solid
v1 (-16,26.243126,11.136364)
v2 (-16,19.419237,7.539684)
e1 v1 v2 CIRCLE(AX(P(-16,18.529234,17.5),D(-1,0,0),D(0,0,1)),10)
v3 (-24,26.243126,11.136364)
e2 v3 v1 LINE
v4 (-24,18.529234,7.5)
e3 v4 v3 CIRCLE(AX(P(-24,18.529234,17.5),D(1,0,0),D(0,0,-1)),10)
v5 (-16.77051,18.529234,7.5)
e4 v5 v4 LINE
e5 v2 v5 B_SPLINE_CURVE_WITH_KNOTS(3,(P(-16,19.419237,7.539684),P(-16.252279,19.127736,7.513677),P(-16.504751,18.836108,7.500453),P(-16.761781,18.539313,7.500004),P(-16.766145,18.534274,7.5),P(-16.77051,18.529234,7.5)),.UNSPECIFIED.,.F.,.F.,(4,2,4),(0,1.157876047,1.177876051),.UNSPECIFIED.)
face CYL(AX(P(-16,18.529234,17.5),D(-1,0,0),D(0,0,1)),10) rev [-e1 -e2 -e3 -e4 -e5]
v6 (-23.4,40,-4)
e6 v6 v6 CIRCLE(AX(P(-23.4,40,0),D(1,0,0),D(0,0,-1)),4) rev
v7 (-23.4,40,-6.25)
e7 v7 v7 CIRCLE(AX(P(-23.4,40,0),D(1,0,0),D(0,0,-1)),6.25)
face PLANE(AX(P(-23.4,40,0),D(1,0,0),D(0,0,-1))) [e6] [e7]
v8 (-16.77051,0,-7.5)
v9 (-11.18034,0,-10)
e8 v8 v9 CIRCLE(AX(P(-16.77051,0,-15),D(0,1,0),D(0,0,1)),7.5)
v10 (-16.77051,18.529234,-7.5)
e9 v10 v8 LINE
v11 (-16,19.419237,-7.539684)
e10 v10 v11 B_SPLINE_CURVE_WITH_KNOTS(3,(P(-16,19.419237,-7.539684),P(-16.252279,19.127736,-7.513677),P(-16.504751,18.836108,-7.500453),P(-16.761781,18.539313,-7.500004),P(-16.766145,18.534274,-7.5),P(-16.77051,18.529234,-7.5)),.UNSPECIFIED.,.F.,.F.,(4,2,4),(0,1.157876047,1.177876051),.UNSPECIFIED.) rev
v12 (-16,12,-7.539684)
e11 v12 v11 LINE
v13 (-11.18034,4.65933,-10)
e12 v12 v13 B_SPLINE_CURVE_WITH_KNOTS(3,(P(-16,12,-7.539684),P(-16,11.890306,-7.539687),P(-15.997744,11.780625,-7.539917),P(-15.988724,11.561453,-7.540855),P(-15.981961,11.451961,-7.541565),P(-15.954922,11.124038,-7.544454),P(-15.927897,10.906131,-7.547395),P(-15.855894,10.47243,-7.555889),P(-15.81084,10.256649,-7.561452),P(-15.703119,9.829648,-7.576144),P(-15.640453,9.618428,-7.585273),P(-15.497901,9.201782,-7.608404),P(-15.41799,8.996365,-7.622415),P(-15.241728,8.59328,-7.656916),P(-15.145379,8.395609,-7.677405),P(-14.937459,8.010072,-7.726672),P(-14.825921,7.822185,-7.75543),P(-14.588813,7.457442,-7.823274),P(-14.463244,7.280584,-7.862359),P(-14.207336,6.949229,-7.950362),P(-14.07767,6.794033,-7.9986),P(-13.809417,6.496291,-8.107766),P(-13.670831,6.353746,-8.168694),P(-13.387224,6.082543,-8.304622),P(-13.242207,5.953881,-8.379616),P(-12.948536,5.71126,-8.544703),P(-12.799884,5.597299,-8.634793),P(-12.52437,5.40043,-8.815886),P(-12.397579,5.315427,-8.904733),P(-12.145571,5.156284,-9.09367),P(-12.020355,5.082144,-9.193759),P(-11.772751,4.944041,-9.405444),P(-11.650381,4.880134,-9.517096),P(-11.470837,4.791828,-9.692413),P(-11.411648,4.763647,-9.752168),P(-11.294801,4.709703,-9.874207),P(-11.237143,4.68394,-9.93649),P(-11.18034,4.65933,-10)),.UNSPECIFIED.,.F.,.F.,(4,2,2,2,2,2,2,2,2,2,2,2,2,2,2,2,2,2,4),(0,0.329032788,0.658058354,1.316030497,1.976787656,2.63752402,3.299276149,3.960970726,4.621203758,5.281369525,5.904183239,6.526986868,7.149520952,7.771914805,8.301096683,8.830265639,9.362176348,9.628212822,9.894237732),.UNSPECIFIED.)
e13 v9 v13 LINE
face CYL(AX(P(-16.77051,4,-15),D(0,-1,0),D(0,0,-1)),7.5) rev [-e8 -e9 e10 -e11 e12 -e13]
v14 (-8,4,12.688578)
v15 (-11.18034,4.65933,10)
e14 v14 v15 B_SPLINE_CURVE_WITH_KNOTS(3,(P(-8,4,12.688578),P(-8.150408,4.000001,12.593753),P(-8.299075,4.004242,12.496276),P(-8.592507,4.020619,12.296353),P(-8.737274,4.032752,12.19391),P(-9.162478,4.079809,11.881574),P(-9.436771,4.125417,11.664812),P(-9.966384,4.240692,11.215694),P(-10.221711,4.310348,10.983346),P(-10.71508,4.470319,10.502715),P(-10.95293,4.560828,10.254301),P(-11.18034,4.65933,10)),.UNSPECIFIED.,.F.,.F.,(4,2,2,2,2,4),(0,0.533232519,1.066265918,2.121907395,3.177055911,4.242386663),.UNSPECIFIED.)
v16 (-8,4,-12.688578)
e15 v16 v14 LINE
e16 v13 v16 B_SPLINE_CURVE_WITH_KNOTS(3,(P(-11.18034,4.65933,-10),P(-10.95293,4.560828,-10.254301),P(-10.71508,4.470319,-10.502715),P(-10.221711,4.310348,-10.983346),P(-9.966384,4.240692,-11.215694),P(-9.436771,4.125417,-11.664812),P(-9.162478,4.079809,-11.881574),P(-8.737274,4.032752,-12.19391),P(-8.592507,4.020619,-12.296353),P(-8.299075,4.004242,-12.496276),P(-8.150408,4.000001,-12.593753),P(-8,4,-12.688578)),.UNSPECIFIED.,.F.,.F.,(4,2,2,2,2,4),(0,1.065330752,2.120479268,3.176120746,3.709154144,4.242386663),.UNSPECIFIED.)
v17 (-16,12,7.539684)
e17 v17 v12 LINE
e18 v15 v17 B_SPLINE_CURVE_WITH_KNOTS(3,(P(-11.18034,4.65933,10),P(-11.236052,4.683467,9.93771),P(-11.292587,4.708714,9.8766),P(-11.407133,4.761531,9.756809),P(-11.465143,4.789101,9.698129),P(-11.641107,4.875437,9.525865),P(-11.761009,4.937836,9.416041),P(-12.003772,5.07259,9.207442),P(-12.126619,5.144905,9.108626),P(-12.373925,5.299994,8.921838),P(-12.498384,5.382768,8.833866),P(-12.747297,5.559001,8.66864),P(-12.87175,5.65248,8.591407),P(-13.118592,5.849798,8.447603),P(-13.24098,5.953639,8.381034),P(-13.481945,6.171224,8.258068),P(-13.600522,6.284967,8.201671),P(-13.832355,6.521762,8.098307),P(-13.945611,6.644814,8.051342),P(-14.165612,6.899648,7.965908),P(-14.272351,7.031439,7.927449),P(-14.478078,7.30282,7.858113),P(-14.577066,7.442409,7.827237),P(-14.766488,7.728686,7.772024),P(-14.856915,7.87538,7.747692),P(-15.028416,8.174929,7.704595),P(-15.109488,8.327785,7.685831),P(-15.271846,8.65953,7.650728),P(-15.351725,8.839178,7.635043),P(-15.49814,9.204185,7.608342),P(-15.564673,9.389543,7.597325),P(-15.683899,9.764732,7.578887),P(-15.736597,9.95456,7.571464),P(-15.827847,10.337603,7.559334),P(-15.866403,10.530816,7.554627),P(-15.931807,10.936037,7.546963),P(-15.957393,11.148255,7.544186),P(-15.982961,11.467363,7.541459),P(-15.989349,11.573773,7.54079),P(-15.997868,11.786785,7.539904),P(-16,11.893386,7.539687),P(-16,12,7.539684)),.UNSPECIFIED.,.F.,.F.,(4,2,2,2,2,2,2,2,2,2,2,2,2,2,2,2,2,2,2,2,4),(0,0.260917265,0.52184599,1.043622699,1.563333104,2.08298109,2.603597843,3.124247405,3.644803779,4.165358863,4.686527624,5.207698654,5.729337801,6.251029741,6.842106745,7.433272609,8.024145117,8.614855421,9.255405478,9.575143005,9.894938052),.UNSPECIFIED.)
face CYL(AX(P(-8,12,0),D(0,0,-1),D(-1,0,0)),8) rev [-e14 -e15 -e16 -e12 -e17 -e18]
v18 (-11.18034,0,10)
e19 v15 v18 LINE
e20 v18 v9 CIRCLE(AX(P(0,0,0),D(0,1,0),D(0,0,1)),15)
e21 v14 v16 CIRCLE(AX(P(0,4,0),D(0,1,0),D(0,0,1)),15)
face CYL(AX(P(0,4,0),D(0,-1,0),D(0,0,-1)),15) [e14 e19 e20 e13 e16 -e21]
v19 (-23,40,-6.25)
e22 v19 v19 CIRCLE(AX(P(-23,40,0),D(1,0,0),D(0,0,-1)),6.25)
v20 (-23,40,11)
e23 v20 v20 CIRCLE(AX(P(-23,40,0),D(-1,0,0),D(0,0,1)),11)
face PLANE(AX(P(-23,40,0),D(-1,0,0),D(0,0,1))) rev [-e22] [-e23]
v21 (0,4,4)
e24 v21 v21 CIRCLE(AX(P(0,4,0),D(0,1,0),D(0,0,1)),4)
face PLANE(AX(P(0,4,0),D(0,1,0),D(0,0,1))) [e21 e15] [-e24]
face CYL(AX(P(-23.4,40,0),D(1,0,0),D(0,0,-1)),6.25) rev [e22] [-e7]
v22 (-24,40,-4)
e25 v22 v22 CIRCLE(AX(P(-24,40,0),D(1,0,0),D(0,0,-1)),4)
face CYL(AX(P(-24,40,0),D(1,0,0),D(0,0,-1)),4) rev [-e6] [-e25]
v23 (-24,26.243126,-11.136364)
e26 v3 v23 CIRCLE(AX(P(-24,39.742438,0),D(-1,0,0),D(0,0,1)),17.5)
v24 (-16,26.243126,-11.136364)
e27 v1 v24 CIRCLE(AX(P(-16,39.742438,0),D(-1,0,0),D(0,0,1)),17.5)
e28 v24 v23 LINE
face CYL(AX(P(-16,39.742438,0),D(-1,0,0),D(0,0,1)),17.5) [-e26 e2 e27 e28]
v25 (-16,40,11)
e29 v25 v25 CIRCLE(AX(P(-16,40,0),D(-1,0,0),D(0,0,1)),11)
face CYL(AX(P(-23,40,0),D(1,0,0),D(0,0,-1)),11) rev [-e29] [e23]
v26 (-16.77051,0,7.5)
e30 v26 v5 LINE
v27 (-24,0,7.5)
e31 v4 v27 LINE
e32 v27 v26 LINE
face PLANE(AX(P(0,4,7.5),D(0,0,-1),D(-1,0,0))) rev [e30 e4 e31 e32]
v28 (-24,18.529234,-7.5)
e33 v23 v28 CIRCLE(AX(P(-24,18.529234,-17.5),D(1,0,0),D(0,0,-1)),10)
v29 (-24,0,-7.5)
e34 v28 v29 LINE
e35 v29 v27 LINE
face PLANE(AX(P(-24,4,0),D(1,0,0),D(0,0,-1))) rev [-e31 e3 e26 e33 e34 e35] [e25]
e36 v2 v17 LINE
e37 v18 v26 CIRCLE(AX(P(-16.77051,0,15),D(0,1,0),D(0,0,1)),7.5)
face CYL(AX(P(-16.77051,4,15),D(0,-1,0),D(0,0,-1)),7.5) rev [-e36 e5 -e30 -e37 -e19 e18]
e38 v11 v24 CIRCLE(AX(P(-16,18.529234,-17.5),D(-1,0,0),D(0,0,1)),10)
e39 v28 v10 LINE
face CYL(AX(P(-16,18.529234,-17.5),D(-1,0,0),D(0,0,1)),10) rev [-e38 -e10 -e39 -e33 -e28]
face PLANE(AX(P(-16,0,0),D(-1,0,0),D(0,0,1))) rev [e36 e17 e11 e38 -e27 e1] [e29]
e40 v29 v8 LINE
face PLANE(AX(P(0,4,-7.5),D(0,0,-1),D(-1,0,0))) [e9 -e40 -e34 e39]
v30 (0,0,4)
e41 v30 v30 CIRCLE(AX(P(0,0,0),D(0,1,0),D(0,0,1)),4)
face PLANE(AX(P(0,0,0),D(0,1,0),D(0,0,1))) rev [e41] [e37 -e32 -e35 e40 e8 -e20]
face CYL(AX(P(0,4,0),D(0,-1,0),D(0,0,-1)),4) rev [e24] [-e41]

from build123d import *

# Parameters (mm, degrees)
EXTRUDE_1_DEPTH     = 4
SKETCH_4_R          = 17.5
EXTRUDE_2_DEPTH     = 8
SKETCH_3_R          = 11
CUT_EXTRUDE_1_DEPTH = 7
FILLET_5_R          = 7.5
FILLET_6_R          = 10
FILLET_7_R          = 8
SKETCH_5_R          = 4
CUT_EXTRUDE_2_DEPTH = 71.900963896
SKETCH_6_R          = 6.25
CUT_EXTRUDE_3_DEPTH = 0.4


with BuildPart() as part:
    # 草圖1 → 填料-伸長1 (new body)
    with BuildSketch(Plane(origin=(0, 0, 0), x_dir=(1, 0, 0), z_dir=(0, 1, 0))):
        with BuildLine():
            Line((-24, -7.5), (-12.990381057, -7.5))
            ThreePointArc((-12.990381057, -7.5), (-14.488887394, -3.882285677), (-15, 0))
            Line((-15, 0), (-24, 0))
            Line((-24, 0), (-24, -7.5))
        make_face()
        with BuildLine():
            ThreePointArc((-15, 0), (-14.488887394, 3.882285677), (-12.990381057, 7.5))
            Line((-12.990381057, 7.5), (-24, 7.5))
            Line((-24, 7.5), (-24, 0))
            Line((-24, 0), (-15, 0))
        make_face()
        with BuildLine():
            ThreePointArc((-4, 0), (0, 4), (4, 0))
            Line((4, 0), (15, 0))
            ThreePointArc((15, 0), (3.882285677, 14.488887394), (-12.990381057, 7.5))
            ThreePointArc((-12.990381057, 7.5), (-14.488887394, 3.882285677), (-15, 0))
            Line((-15, 0), (-4, 0))
        make_face()
        with BuildLine():
            Line((15, 0), (4, 0))
            ThreePointArc((4, 0), (0, -4), (-4, 0))
            Line((-4, 0), (-15, 0))
            ThreePointArc((-15, 0), (-14.488887394, -3.882285677), (-12.990381057, -7.5))
            ThreePointArc((-12.990381057, -7.5), (3.882285677, -14.488887394), (15, 0))
        make_face()
    extrude(amount=EXTRUDE_1_DEPTH)

    # 草圖4 → 填料-伸長2 (add)
    with BuildSketch(Plane.ZY.offset(24)):
        with Locations((0, 39.742437699)):
            Circle(SKETCH_4_R)
        with BuildLine():
            ThreePointArc((7.5, 23.931049399), (0, 22.242437699), (-7.5, 23.931049399))
            Line((-7.5, 23.931049399), (-7.5, 4))
            Line((-7.5, 4), (7.5, 4))
            Line((7.5, 4), (7.5, 23.931049399))
        make_face()
    extrude(amount=-EXTRUDE_2_DEPTH)

    # 草圖3 → 除料-伸長1 (cut)
    with BuildSketch(Plane.ZY.offset(16)):
        with Locations((0, 40)):
            Circle(SKETCH_3_R)
    extrude(amount=CUT_EXTRUDE_1_DEPTH, mode=Mode.SUBTRACT)

    # 圓角5
    fillet_5_edges = [part.edges().sort_by_distance(p)[0] for p in [
        (-12.990381057, 2, -7.5),
    ]]
    fillet(fillet_5_edges, radius=FILLET_5_R)
    fillet_5_2_edges = [part.edges().sort_by_distance(p)[0] for p in [
        (-12.990381057, 2, 7.5),
    ]]
    fillet(fillet_5_2_edges, radius=FILLET_5_R)

    # 圓角6
    # the kernel refuses this fillet: 10 mm, written as the material it adds along each edge
    with BuildSketch(Plane(origin=(-24, 23.931049399, -7.5), x_dir=(0, -1, 0), z_dir=(1, 0, 0))) as fillet_6_piece_1_section:
        with BuildLine():
            CenterArc((5.401815135, 10), FILLET_6_R, 219.521196359, 50.478803641)
            ThreePointArc((-2.312077024, 3.636363636), (-1.04368494, 1.889618599), (0, 0))
            Line((0, 0), (5.401815135, 0))
        make_face()
    fillet_6_piece_1 = extrude(amount=20.734028006, mode=Mode.PRIVATE)
    fillet_6_piece_1 = split(fillet_6_piece_1, bisect_by=Plane(origin=(-16, 22.860103081, -8.083386196), z_dir=(-1, 0, 0)), keep=Keep.TOP, mode=Mode.PRIVATE)
    add(fillet_6_piece_1)
    with BuildSketch(Plane(origin=(-24, 23.931049399, 7.5), x_dir=(0, -1, 0), z_dir=(1, 0, 0))) as fillet_6_piece_2_section:
        with BuildLine():
            CenterArc((5.401815135, -10), FILLET_6_R, 90, 50.478803641)
            ThreePointArc((-2.312077024, -3.636363636), (-1.04368494, -1.889618599), (0, 0))
            Line((0, 0), (5.401815135, 0))
        make_face()
    fillet_6_piece_2 = extrude(amount=20.734028006, mode=Mode.PRIVATE)
    fillet_6_piece_2 = split(fillet_6_piece_2, bisect_by=Plane(origin=(-16, 22.860102946, 8.083386188), z_dir=(-1, 0, 0)), keep=Keep.TOP, mode=Mode.PRIVATE)
    add(fillet_6_piece_2)

    # 圓角7
    fillet_7_edges = [part.edges().sort_by_distance(p)[0] for p in [
        (-16, 4, 0),
    ]]
    fillet(fillet_7_edges, radius=FILLET_7_R)

    # 草圖5 → 除料-伸長2 (cut, through all)
    with BuildSketch(Plane(origin=(-23, 0, 0), x_dir=(0, 0, -1), z_dir=(1, 0, 0))):
        with Locations((0, 40)):
            Circle(SKETCH_5_R)
    extrude(amount=-CUT_EXTRUDE_2_DEPTH, mode=Mode.SUBTRACT)

    # 草圖6 → 除料-伸長3 (cut)
    with BuildSketch(Plane(origin=(-23, 0, 0), x_dir=(0, 0, -1), z_dir=(1, 0, 0))):
        with Locations((0, 40)):
            Circle(SKETCH_6_R)
    extrude(amount=-CUT_EXTRUDE_3_DEPTH, mode=Mode.SUBTRACT)


solid = part.part
